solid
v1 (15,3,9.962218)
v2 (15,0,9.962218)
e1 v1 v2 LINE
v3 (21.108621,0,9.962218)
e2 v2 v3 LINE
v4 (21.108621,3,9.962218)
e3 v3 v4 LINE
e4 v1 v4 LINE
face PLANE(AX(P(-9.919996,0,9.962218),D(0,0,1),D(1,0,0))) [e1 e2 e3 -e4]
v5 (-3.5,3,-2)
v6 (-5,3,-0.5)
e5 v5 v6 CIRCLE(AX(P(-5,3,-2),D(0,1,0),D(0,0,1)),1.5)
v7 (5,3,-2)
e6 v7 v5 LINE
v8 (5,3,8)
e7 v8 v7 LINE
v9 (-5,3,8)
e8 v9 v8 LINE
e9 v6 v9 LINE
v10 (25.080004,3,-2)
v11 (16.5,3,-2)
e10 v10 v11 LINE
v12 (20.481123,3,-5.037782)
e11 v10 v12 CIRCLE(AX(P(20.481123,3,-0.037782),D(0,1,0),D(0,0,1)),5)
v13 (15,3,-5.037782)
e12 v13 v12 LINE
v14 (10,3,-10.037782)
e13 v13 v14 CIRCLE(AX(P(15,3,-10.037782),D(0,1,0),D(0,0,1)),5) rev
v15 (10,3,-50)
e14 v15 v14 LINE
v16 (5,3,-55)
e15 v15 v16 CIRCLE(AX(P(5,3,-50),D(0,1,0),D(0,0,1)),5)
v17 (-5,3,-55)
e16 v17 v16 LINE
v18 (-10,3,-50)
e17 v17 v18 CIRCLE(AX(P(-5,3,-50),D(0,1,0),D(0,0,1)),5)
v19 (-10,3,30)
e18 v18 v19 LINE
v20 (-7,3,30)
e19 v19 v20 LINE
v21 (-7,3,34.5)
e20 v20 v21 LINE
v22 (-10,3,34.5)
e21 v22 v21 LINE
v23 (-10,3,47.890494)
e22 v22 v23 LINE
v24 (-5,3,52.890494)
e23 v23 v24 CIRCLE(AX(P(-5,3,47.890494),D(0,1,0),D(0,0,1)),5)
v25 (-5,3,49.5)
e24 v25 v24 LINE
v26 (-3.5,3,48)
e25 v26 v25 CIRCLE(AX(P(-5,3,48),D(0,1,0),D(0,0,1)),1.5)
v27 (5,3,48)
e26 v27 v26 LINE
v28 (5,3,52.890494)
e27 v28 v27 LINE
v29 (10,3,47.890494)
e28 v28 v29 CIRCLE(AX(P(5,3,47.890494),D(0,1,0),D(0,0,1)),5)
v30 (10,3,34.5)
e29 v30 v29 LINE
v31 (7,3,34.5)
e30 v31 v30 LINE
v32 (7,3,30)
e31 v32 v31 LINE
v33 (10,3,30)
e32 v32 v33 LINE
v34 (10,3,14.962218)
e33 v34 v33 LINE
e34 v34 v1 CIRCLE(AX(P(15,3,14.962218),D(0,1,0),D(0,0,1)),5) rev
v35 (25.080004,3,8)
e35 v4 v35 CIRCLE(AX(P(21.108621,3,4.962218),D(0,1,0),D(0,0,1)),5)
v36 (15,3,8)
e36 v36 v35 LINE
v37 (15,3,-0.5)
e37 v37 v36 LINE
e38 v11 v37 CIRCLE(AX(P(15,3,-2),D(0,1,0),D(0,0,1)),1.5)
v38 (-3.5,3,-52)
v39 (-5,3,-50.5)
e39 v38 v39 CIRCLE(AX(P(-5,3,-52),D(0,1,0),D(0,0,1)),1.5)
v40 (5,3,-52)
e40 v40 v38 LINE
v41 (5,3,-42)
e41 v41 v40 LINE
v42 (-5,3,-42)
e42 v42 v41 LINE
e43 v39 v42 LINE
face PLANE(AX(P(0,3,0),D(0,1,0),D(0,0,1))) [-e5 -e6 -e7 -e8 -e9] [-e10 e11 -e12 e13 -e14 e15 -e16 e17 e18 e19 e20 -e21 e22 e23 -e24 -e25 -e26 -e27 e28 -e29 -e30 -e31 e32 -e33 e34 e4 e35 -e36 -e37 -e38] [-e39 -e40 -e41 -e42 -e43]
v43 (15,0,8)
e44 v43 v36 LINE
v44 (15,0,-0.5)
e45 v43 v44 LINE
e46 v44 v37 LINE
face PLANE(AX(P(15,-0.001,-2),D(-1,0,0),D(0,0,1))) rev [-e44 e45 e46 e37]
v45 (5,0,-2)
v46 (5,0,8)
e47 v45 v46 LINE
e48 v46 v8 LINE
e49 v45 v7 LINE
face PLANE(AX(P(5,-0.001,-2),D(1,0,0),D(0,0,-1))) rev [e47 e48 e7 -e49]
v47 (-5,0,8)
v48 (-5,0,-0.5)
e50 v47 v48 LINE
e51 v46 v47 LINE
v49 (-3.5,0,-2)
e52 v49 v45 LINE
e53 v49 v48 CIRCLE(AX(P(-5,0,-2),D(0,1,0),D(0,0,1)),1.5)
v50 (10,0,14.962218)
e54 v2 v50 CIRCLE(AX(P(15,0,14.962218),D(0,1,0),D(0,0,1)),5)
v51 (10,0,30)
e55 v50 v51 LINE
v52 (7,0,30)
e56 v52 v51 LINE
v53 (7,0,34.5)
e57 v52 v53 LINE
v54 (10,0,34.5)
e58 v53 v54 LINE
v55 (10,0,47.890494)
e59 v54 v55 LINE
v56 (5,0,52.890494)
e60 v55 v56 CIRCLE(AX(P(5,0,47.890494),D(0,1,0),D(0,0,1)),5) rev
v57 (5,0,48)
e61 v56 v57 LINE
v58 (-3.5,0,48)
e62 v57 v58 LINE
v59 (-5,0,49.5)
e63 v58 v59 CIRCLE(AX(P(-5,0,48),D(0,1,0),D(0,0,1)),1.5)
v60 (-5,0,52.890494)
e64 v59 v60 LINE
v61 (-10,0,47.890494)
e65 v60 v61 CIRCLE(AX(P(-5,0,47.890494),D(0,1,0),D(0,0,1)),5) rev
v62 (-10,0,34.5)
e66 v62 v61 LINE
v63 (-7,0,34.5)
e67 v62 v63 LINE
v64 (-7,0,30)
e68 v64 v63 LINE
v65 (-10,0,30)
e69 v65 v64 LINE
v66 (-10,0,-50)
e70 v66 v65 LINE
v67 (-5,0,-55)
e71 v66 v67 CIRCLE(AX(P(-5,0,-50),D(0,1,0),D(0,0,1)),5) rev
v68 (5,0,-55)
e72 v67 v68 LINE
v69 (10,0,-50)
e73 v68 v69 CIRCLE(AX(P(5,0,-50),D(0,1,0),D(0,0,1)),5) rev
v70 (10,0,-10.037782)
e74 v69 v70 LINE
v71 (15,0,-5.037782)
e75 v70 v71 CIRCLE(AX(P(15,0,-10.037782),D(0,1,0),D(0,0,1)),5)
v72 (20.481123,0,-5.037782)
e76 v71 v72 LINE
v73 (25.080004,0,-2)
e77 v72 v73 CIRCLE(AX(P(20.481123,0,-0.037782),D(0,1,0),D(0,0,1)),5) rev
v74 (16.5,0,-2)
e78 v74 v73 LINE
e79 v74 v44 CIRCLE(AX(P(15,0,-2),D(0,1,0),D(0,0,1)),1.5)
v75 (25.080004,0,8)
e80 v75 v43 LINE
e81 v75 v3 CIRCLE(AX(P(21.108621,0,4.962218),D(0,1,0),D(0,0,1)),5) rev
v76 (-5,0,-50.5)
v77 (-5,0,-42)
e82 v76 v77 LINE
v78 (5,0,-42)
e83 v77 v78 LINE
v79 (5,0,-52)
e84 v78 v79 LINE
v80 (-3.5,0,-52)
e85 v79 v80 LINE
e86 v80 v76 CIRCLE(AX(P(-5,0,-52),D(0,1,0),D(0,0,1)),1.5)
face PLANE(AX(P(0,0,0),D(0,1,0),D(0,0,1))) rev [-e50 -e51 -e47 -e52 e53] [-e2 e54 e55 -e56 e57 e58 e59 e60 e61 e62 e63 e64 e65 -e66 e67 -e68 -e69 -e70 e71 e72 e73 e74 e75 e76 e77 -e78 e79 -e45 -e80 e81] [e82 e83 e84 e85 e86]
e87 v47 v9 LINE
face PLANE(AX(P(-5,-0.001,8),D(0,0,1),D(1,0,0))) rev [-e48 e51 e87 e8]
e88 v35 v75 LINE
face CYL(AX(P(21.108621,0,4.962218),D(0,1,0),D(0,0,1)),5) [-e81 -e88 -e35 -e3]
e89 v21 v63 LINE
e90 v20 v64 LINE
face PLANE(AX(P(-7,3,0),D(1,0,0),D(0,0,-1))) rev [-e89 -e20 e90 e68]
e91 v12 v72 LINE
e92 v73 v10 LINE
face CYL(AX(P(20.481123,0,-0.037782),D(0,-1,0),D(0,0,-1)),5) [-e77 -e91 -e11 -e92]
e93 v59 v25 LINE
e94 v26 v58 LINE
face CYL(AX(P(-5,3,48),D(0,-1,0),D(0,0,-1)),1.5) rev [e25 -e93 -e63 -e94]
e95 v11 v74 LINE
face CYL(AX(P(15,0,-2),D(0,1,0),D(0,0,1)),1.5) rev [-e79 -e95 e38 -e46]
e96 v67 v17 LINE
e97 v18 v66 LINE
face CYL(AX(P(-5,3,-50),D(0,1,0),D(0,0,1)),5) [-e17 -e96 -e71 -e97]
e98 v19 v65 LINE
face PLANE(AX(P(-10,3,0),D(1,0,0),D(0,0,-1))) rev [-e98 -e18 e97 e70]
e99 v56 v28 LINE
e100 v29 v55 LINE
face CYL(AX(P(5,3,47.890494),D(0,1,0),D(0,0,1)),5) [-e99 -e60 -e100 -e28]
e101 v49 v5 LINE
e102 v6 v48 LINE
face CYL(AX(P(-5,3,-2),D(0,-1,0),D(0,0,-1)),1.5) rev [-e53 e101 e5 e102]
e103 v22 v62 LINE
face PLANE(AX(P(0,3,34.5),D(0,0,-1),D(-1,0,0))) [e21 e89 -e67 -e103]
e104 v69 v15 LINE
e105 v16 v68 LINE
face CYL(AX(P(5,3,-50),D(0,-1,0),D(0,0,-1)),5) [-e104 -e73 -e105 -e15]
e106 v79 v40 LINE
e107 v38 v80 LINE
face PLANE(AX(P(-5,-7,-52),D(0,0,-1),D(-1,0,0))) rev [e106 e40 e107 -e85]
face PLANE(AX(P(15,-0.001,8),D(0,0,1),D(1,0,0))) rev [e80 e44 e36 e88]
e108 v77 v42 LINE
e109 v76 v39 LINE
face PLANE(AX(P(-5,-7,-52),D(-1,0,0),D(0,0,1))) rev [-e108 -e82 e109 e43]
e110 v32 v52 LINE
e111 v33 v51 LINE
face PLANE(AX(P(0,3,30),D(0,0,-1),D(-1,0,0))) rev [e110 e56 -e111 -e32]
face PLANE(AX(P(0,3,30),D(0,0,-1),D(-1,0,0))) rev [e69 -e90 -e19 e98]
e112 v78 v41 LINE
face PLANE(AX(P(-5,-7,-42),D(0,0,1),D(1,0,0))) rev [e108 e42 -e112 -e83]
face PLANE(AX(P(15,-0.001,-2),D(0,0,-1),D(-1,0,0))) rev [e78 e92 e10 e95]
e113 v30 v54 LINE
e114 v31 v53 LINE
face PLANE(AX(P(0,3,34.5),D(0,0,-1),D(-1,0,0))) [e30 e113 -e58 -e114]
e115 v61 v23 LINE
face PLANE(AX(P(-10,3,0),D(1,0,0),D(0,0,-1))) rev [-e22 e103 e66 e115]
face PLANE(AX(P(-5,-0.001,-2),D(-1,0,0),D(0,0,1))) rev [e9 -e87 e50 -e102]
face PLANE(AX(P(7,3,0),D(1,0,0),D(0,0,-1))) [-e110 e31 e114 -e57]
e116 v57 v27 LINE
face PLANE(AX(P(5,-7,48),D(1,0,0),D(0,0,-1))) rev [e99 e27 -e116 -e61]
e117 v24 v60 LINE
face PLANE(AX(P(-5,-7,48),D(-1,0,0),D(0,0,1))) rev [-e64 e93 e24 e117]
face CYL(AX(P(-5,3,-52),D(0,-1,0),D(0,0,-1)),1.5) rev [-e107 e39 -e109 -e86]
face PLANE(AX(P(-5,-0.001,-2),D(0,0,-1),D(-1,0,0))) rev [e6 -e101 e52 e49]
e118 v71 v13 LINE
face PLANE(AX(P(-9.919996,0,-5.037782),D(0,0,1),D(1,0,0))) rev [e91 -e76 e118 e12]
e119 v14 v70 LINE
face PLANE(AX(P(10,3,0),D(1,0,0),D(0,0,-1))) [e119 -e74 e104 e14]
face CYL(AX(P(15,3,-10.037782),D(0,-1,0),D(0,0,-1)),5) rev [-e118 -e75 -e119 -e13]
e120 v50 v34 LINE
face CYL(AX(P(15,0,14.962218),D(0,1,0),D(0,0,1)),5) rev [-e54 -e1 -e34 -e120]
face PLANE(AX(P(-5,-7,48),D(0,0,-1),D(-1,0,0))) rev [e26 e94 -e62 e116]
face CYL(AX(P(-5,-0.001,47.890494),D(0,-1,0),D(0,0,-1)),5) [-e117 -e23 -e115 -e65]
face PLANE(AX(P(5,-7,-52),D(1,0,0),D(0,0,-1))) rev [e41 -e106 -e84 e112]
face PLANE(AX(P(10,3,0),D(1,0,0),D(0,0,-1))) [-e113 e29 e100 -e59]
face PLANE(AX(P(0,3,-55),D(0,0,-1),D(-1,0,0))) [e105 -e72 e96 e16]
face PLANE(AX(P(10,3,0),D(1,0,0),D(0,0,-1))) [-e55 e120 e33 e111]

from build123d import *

# Parameters (mm, degrees)
SKETCH1_R           = 1.5
SKETCH1_W           = 20
SKETCH1_H           = 5
BOSS_EXTRUDE3_DEPTH = 3
FILLET2_R           = 5
CUT_EXTRUDE1_REACH  = 74.753
SKETCH3_W           = 28.786192162
SKETCH3_H           = 21.000620262
FILLET3_R           = 5
SKETCH5_W           = 10
SKETCH5_H           = 10
CUT_EXTRUDE2_DEPTH  = 10
BOSS_EXTRUDE5_START = -3
SKETCH8_W           = 35
SKETCH8_H           = 15
SKETCH8_R           = 1.5
BOSS_EXTRUDE5_DEPTH = 3
CUT_EXTRUDE3_REACH  = 62.523
SKETCH9_W           = 10
SKETCH9_H           = 10
SKETCH9_W_2         = 11
FILLET4_R           = 5


with BuildPart() as part:
    # Sketch1 → Boss-Extrude3 (new body)
    # profile 1 of 3: a face of its own
    with BuildSketch(Plane(origin=(0, 0, 0), x_dir=(1, 0, 0), z_dir=(0, 1, 0))):
        Polygon((10, 55), (-10, 55), (-10, -30), (-7, -30), (-7, -34.5), (-10, -34.5), (-10, -50), (10, -50), (10, -34.5), (7, -34.5), (7, -30), (10, -30), align=None)
        with Locations(Location((-5, -48, 0), (0, 0, 270))):
            Circle(SKETCH1_R, mode=Mode.SUBTRACT)
        with Locations(Location((-5, 2, 0), (0, 0, 270))):
            Circle(SKETCH1_R, mode=Mode.SUBTRACT)
        with Locations(Location((-5, 52, 0), (0, 0, 270))):
            Circle(SKETCH1_R, mode=Mode.SUBTRACT)
    # profile 2 of 3: a face of its own
    with BuildSketch(Plane(origin=(0, 0, 0), x_dir=(1, 0, 0), z_dir=(0, 1, 0))):
        Polygon((10, -55), (-10, -55), (-10, -64.5), (-7, -64.5), (-7, -69), (-10, -69), (-10, -72), (10, -72), (10, -69), (7, -69), (7, -64.5), (10, -64.5), align=None)
    # profile 3 of 3: a face of its own
    with BuildSketch(Plane(origin=(0, 0, 0), x_dir=(1, 0, 0), z_dir=(0, 1, 0))):
        with Locations((0, -52.5)):
            Rectangle(SKETCH1_W, SKETCH1_H)
    extrude(amount=BOSS_EXTRUDE3_DEPTH)

    # Fillet2
    # the kernel refuses this fillet: 5 mm, written as the material it takes off along each edge
    with BuildSketch(Plane(origin=(10, -11.456439237, 72), x_dir=(0, 0, -1), z_dir=(0, 1, 0))) as fillet2_piece_1:
        with BuildLine():
            CenterArc((5, 4.582575695), FILLET2_R, 180, 66.421821522)
            Line((0, 4.582575695), (-0.1, 4.582575695))
            Line((-0.1, 4.582575695), (-0.1, 0))
            Line((-0.1, 0), (0, -0.1))
            ThreePointArc((0, -0.1), (1.5, -0.1), (2.96, -0.091651514))
            Line((2.96, -0.091651514), (3, 0))
        make_face()
    extrude(amount=25.912878475, mode=Mode.SUBTRACT)
    with BuildSketch(Plane(origin=(-10, -11.456439237, 72), x_dir=(1, 0, 0), z_dir=(0, 1, 0))) as fillet2_piece_2:
        with BuildLine():
            CenterArc((4.582575695, 5), FILLET2_R, 203.578178478, 66.421821522)
            Line((0, 3), (-0.091651514, 2.96))
            ThreePointArc((-0.091651514, 2.96), (-0.1, 1.5), (-0.1, 0))
            Line((-0.1, 0), (0, -0.1))
            Line((0, -0.1), (4.582575695, -0.1))
            Line((4.582575695, -0.1), (4.582575695, 0))
        make_face()
    extrude(amount=25.912878475, mode=Mode.SUBTRACT)
    with BuildSketch(Plane(origin=(-10, -12.5, -55), x_dir=(0, 0, 1), z_dir=(0, 1, 0))) as fillet2_piece_3:
        with BuildLine():
            CenterArc((FILLET2_R, FILLET2_R), FILLET2_R, 180, 90)
            Line((0, FILLET2_R), (-FILLET2_R * 0.02, FILLET2_R))
            Line((-FILLET2_R * 0.02, FILLET2_R), (-FILLET2_R * 0.02, -FILLET2_R * 0.02))
            Line((-FILLET2_R * 0.02, -FILLET2_R * 0.02), (FILLET2_R, -FILLET2_R * 0.02))
            Line((FILLET2_R, -FILLET2_R * 0.02), (FILLET2_R, 0))
        make_face()
    extrude(amount=28, mode=Mode.SUBTRACT)
    with BuildSketch(Plane(origin=(10, -12.5, -55), x_dir=(0, 0, 1), z_dir=(0, 1, 0))) as fillet2_piece_4:
        with BuildLine():
            CenterArc((FILLET2_R, -FILLET2_R), FILLET2_R, 90, 90)
            Line((0, -FILLET2_R), (-FILLET2_R * 0.02, -FILLET2_R))
            Line((-FILLET2_R * 0.02, -FILLET2_R), (-FILLET2_R * 0.02, FILLET2_R * 0.02))
            Line((-FILLET2_R * 0.02, FILLET2_R * 0.02), (FILLET2_R, FILLET2_R * 0.02))
            Line((FILLET2_R, FILLET2_R * 0.02), (FILLET2_R, 0))
        make_face()
    extrude(amount=28, mode=Mode.SUBTRACT)

    # Sketch3 → Cut-Extrude1 (cut, up to next)
    with BuildSketch(Plane(origin=(0, 3, 0), x_dir=(1, 0, 0), z_dir=(0, 1, 0)), mode=Mode.PRIVATE) as cut_extrude1_sk1:
        with Locations((0, -63.390803798)):
            Rectangle(SKETCH3_W, SKETCH3_H)
    cut_extrude1_tool1 = extrude(cut_extrude1_sk1.sketch, amount=-CUT_EXTRUDE1_REACH, mode=Mode.PRIVATE) & part.part
    add(cut_extrude1_tool1.solids().sort_by_distance((0, 3, 63.390804))[0], mode=Mode.SUBTRACT)

    # Fillet3
    fillet3_edges = [part.edges().sort_by_distance(p)[0] for p in [
        (10, 1.5, 52.890493667),
        (-10, 1.5, 52.890493667),
    ]]
    fillet(fillet3_edges, radius=FILLET3_R)

    # Sketch5 → Cut-Extrude2 (cut)
    with BuildSketch(Plane(origin=(0, 3, 0), x_dir=(1, 0, 0), z_dir=(0, 1, 0))):
        with Locations((0, -53)):
            Rectangle(SKETCH5_W, SKETCH5_H)
        with Locations((0, 47)):
            Rectangle(SKETCH5_W, SKETCH5_H)
    extrude(amount=-CUT_EXTRUDE2_DEPTH, mode=Mode.SUBTRACT)

    # Sketch8 → Boss-Extrude5 (add)
    with BuildSketch(Plane(origin=(0, 3, 0), x_dir=(1, 0, 0), z_dir=(0, 1, 0)).offset(BOSS_EXTRUDE5_START)):
        with Locations((7.580003557, -2.462217959)):
            Rectangle(SKETCH8_W, SKETCH8_H)
        with Locations(Location((15, 2, 0), (0, 0, 270))):
            Circle(SKETCH8_R, mode=Mode.SUBTRACT)
        with Locations(Location((-5, 2, 0), (0, 0, 270))):
            Circle(SKETCH8_R, mode=Mode.SUBTRACT)
    extrude(amount=BOSS_EXTRUDE5_DEPTH)

    # Sketch9 → Cut-Extrude3 (cut, up to next)
    with BuildSketch(Plane(origin=(0, 3, 0), x_dir=(1, 0, 0), z_dir=(0, 1, 0)), mode=Mode.PRIVATE) as cut_extrude3_sk1:
        with Locations((0, -3)):
            Rectangle(SKETCH9_W, SKETCH9_H)
    cut_extrude3_tool1 = extrude(cut_extrude3_sk1.sketch, amount=-CUT_EXTRUDE3_REACH, mode=Mode.PRIVATE) & part.part
    # Sketch9 → Cut-Extrude3 (cut, up to next)
    with BuildSketch(Plane(origin=(0, 3, 0), x_dir=(1, 0, 0), z_dir=(0, 1, 0)), mode=Mode.PRIVATE) as cut_extrude3_sk2:
        with Locations((20.5, -3)):
            Rectangle(SKETCH9_W_2, SKETCH9_H)
    cut_extrude3_tool2 = extrude(cut_extrude3_sk2.sketch, amount=-CUT_EXTRUDE3_REACH, mode=Mode.PRIVATE) & part.part
    add(cut_extrude3_tool1.solids().sort_by_distance((0, 3, 3))[0], mode=Mode.SUBTRACT)
    add(cut_extrude3_tool2.solids().sort_by_distance((20.5, 3, 3))[0], mode=Mode.SUBTRACT)

    # Fillet4
    # the kernel refuses this fillet: 5 mm, written as the material it adds along each edge
    with BuildSketch(Plane(origin=(10, 0, 9.962217959), x_dir=(1, 0, 0), z_dir=(0, 1, 0))) as fillet4_piece_1:
        with BuildLine():
            CenterArc((FILLET4_R, -FILLET4_R), FILLET4_R, 90, 90)
            Line((0, -FILLET4_R), (0, 0))
            Line((0, 0), (FILLET4_R, 0))
        make_face()
    extrude(amount=3)
    with BuildSketch(Plane(origin=(10, 3, -5.037782041), x_dir=(0, 0, -1), z_dir=(0, -1, 0))) as fillet4_piece_2:
        with BuildLine():
            CenterArc((FILLET4_R, FILLET4_R), FILLET4_R, 180, 90)
            Line((0, FILLET4_R), (0, 0))
            Line((0, 0), (FILLET4_R, 0))
        make_face()
    extrude(amount=3)
    # the kernel refuses this fillet: 5 mm, written as the material it takes off along each edge
    with BuildSketch(Plane(origin=(25.080003557, -9.928456662, 9.962217959), x_dir=(0, 0, -1), z_dir=(0, 1, 0))) as fillet4_2_piece_1:
        with BuildLine():
            CenterArc((5, 3.971382665), FILLET4_R, 180, 52.586975679)
            Line((0, 3.971382665), (0, 0))
            Line((0, 0), (1.962217959, 0))
        make_face()
    extrude(amount=22.856913325, mode=Mode.SUBTRACT)
    with BuildSketch(Plane(origin=(25.080003557, -11.497200931, -5.037782041), x_dir=(-1, 0, 0), z_dir=(0, 1, 0))) as fillet4_2_piece_2:
        with BuildLine():
            CenterArc((4.598880373, 5), FILLET4_R, 203.106632515, 66.893367485)
            Line((0, 3.037782041), (0, 0))
            Line((0, 0), (4.598880373, 0))
        make_face()
    extrude(amount=25.994401863, mode=Mode.SUBTRACT)


solid = part.part
